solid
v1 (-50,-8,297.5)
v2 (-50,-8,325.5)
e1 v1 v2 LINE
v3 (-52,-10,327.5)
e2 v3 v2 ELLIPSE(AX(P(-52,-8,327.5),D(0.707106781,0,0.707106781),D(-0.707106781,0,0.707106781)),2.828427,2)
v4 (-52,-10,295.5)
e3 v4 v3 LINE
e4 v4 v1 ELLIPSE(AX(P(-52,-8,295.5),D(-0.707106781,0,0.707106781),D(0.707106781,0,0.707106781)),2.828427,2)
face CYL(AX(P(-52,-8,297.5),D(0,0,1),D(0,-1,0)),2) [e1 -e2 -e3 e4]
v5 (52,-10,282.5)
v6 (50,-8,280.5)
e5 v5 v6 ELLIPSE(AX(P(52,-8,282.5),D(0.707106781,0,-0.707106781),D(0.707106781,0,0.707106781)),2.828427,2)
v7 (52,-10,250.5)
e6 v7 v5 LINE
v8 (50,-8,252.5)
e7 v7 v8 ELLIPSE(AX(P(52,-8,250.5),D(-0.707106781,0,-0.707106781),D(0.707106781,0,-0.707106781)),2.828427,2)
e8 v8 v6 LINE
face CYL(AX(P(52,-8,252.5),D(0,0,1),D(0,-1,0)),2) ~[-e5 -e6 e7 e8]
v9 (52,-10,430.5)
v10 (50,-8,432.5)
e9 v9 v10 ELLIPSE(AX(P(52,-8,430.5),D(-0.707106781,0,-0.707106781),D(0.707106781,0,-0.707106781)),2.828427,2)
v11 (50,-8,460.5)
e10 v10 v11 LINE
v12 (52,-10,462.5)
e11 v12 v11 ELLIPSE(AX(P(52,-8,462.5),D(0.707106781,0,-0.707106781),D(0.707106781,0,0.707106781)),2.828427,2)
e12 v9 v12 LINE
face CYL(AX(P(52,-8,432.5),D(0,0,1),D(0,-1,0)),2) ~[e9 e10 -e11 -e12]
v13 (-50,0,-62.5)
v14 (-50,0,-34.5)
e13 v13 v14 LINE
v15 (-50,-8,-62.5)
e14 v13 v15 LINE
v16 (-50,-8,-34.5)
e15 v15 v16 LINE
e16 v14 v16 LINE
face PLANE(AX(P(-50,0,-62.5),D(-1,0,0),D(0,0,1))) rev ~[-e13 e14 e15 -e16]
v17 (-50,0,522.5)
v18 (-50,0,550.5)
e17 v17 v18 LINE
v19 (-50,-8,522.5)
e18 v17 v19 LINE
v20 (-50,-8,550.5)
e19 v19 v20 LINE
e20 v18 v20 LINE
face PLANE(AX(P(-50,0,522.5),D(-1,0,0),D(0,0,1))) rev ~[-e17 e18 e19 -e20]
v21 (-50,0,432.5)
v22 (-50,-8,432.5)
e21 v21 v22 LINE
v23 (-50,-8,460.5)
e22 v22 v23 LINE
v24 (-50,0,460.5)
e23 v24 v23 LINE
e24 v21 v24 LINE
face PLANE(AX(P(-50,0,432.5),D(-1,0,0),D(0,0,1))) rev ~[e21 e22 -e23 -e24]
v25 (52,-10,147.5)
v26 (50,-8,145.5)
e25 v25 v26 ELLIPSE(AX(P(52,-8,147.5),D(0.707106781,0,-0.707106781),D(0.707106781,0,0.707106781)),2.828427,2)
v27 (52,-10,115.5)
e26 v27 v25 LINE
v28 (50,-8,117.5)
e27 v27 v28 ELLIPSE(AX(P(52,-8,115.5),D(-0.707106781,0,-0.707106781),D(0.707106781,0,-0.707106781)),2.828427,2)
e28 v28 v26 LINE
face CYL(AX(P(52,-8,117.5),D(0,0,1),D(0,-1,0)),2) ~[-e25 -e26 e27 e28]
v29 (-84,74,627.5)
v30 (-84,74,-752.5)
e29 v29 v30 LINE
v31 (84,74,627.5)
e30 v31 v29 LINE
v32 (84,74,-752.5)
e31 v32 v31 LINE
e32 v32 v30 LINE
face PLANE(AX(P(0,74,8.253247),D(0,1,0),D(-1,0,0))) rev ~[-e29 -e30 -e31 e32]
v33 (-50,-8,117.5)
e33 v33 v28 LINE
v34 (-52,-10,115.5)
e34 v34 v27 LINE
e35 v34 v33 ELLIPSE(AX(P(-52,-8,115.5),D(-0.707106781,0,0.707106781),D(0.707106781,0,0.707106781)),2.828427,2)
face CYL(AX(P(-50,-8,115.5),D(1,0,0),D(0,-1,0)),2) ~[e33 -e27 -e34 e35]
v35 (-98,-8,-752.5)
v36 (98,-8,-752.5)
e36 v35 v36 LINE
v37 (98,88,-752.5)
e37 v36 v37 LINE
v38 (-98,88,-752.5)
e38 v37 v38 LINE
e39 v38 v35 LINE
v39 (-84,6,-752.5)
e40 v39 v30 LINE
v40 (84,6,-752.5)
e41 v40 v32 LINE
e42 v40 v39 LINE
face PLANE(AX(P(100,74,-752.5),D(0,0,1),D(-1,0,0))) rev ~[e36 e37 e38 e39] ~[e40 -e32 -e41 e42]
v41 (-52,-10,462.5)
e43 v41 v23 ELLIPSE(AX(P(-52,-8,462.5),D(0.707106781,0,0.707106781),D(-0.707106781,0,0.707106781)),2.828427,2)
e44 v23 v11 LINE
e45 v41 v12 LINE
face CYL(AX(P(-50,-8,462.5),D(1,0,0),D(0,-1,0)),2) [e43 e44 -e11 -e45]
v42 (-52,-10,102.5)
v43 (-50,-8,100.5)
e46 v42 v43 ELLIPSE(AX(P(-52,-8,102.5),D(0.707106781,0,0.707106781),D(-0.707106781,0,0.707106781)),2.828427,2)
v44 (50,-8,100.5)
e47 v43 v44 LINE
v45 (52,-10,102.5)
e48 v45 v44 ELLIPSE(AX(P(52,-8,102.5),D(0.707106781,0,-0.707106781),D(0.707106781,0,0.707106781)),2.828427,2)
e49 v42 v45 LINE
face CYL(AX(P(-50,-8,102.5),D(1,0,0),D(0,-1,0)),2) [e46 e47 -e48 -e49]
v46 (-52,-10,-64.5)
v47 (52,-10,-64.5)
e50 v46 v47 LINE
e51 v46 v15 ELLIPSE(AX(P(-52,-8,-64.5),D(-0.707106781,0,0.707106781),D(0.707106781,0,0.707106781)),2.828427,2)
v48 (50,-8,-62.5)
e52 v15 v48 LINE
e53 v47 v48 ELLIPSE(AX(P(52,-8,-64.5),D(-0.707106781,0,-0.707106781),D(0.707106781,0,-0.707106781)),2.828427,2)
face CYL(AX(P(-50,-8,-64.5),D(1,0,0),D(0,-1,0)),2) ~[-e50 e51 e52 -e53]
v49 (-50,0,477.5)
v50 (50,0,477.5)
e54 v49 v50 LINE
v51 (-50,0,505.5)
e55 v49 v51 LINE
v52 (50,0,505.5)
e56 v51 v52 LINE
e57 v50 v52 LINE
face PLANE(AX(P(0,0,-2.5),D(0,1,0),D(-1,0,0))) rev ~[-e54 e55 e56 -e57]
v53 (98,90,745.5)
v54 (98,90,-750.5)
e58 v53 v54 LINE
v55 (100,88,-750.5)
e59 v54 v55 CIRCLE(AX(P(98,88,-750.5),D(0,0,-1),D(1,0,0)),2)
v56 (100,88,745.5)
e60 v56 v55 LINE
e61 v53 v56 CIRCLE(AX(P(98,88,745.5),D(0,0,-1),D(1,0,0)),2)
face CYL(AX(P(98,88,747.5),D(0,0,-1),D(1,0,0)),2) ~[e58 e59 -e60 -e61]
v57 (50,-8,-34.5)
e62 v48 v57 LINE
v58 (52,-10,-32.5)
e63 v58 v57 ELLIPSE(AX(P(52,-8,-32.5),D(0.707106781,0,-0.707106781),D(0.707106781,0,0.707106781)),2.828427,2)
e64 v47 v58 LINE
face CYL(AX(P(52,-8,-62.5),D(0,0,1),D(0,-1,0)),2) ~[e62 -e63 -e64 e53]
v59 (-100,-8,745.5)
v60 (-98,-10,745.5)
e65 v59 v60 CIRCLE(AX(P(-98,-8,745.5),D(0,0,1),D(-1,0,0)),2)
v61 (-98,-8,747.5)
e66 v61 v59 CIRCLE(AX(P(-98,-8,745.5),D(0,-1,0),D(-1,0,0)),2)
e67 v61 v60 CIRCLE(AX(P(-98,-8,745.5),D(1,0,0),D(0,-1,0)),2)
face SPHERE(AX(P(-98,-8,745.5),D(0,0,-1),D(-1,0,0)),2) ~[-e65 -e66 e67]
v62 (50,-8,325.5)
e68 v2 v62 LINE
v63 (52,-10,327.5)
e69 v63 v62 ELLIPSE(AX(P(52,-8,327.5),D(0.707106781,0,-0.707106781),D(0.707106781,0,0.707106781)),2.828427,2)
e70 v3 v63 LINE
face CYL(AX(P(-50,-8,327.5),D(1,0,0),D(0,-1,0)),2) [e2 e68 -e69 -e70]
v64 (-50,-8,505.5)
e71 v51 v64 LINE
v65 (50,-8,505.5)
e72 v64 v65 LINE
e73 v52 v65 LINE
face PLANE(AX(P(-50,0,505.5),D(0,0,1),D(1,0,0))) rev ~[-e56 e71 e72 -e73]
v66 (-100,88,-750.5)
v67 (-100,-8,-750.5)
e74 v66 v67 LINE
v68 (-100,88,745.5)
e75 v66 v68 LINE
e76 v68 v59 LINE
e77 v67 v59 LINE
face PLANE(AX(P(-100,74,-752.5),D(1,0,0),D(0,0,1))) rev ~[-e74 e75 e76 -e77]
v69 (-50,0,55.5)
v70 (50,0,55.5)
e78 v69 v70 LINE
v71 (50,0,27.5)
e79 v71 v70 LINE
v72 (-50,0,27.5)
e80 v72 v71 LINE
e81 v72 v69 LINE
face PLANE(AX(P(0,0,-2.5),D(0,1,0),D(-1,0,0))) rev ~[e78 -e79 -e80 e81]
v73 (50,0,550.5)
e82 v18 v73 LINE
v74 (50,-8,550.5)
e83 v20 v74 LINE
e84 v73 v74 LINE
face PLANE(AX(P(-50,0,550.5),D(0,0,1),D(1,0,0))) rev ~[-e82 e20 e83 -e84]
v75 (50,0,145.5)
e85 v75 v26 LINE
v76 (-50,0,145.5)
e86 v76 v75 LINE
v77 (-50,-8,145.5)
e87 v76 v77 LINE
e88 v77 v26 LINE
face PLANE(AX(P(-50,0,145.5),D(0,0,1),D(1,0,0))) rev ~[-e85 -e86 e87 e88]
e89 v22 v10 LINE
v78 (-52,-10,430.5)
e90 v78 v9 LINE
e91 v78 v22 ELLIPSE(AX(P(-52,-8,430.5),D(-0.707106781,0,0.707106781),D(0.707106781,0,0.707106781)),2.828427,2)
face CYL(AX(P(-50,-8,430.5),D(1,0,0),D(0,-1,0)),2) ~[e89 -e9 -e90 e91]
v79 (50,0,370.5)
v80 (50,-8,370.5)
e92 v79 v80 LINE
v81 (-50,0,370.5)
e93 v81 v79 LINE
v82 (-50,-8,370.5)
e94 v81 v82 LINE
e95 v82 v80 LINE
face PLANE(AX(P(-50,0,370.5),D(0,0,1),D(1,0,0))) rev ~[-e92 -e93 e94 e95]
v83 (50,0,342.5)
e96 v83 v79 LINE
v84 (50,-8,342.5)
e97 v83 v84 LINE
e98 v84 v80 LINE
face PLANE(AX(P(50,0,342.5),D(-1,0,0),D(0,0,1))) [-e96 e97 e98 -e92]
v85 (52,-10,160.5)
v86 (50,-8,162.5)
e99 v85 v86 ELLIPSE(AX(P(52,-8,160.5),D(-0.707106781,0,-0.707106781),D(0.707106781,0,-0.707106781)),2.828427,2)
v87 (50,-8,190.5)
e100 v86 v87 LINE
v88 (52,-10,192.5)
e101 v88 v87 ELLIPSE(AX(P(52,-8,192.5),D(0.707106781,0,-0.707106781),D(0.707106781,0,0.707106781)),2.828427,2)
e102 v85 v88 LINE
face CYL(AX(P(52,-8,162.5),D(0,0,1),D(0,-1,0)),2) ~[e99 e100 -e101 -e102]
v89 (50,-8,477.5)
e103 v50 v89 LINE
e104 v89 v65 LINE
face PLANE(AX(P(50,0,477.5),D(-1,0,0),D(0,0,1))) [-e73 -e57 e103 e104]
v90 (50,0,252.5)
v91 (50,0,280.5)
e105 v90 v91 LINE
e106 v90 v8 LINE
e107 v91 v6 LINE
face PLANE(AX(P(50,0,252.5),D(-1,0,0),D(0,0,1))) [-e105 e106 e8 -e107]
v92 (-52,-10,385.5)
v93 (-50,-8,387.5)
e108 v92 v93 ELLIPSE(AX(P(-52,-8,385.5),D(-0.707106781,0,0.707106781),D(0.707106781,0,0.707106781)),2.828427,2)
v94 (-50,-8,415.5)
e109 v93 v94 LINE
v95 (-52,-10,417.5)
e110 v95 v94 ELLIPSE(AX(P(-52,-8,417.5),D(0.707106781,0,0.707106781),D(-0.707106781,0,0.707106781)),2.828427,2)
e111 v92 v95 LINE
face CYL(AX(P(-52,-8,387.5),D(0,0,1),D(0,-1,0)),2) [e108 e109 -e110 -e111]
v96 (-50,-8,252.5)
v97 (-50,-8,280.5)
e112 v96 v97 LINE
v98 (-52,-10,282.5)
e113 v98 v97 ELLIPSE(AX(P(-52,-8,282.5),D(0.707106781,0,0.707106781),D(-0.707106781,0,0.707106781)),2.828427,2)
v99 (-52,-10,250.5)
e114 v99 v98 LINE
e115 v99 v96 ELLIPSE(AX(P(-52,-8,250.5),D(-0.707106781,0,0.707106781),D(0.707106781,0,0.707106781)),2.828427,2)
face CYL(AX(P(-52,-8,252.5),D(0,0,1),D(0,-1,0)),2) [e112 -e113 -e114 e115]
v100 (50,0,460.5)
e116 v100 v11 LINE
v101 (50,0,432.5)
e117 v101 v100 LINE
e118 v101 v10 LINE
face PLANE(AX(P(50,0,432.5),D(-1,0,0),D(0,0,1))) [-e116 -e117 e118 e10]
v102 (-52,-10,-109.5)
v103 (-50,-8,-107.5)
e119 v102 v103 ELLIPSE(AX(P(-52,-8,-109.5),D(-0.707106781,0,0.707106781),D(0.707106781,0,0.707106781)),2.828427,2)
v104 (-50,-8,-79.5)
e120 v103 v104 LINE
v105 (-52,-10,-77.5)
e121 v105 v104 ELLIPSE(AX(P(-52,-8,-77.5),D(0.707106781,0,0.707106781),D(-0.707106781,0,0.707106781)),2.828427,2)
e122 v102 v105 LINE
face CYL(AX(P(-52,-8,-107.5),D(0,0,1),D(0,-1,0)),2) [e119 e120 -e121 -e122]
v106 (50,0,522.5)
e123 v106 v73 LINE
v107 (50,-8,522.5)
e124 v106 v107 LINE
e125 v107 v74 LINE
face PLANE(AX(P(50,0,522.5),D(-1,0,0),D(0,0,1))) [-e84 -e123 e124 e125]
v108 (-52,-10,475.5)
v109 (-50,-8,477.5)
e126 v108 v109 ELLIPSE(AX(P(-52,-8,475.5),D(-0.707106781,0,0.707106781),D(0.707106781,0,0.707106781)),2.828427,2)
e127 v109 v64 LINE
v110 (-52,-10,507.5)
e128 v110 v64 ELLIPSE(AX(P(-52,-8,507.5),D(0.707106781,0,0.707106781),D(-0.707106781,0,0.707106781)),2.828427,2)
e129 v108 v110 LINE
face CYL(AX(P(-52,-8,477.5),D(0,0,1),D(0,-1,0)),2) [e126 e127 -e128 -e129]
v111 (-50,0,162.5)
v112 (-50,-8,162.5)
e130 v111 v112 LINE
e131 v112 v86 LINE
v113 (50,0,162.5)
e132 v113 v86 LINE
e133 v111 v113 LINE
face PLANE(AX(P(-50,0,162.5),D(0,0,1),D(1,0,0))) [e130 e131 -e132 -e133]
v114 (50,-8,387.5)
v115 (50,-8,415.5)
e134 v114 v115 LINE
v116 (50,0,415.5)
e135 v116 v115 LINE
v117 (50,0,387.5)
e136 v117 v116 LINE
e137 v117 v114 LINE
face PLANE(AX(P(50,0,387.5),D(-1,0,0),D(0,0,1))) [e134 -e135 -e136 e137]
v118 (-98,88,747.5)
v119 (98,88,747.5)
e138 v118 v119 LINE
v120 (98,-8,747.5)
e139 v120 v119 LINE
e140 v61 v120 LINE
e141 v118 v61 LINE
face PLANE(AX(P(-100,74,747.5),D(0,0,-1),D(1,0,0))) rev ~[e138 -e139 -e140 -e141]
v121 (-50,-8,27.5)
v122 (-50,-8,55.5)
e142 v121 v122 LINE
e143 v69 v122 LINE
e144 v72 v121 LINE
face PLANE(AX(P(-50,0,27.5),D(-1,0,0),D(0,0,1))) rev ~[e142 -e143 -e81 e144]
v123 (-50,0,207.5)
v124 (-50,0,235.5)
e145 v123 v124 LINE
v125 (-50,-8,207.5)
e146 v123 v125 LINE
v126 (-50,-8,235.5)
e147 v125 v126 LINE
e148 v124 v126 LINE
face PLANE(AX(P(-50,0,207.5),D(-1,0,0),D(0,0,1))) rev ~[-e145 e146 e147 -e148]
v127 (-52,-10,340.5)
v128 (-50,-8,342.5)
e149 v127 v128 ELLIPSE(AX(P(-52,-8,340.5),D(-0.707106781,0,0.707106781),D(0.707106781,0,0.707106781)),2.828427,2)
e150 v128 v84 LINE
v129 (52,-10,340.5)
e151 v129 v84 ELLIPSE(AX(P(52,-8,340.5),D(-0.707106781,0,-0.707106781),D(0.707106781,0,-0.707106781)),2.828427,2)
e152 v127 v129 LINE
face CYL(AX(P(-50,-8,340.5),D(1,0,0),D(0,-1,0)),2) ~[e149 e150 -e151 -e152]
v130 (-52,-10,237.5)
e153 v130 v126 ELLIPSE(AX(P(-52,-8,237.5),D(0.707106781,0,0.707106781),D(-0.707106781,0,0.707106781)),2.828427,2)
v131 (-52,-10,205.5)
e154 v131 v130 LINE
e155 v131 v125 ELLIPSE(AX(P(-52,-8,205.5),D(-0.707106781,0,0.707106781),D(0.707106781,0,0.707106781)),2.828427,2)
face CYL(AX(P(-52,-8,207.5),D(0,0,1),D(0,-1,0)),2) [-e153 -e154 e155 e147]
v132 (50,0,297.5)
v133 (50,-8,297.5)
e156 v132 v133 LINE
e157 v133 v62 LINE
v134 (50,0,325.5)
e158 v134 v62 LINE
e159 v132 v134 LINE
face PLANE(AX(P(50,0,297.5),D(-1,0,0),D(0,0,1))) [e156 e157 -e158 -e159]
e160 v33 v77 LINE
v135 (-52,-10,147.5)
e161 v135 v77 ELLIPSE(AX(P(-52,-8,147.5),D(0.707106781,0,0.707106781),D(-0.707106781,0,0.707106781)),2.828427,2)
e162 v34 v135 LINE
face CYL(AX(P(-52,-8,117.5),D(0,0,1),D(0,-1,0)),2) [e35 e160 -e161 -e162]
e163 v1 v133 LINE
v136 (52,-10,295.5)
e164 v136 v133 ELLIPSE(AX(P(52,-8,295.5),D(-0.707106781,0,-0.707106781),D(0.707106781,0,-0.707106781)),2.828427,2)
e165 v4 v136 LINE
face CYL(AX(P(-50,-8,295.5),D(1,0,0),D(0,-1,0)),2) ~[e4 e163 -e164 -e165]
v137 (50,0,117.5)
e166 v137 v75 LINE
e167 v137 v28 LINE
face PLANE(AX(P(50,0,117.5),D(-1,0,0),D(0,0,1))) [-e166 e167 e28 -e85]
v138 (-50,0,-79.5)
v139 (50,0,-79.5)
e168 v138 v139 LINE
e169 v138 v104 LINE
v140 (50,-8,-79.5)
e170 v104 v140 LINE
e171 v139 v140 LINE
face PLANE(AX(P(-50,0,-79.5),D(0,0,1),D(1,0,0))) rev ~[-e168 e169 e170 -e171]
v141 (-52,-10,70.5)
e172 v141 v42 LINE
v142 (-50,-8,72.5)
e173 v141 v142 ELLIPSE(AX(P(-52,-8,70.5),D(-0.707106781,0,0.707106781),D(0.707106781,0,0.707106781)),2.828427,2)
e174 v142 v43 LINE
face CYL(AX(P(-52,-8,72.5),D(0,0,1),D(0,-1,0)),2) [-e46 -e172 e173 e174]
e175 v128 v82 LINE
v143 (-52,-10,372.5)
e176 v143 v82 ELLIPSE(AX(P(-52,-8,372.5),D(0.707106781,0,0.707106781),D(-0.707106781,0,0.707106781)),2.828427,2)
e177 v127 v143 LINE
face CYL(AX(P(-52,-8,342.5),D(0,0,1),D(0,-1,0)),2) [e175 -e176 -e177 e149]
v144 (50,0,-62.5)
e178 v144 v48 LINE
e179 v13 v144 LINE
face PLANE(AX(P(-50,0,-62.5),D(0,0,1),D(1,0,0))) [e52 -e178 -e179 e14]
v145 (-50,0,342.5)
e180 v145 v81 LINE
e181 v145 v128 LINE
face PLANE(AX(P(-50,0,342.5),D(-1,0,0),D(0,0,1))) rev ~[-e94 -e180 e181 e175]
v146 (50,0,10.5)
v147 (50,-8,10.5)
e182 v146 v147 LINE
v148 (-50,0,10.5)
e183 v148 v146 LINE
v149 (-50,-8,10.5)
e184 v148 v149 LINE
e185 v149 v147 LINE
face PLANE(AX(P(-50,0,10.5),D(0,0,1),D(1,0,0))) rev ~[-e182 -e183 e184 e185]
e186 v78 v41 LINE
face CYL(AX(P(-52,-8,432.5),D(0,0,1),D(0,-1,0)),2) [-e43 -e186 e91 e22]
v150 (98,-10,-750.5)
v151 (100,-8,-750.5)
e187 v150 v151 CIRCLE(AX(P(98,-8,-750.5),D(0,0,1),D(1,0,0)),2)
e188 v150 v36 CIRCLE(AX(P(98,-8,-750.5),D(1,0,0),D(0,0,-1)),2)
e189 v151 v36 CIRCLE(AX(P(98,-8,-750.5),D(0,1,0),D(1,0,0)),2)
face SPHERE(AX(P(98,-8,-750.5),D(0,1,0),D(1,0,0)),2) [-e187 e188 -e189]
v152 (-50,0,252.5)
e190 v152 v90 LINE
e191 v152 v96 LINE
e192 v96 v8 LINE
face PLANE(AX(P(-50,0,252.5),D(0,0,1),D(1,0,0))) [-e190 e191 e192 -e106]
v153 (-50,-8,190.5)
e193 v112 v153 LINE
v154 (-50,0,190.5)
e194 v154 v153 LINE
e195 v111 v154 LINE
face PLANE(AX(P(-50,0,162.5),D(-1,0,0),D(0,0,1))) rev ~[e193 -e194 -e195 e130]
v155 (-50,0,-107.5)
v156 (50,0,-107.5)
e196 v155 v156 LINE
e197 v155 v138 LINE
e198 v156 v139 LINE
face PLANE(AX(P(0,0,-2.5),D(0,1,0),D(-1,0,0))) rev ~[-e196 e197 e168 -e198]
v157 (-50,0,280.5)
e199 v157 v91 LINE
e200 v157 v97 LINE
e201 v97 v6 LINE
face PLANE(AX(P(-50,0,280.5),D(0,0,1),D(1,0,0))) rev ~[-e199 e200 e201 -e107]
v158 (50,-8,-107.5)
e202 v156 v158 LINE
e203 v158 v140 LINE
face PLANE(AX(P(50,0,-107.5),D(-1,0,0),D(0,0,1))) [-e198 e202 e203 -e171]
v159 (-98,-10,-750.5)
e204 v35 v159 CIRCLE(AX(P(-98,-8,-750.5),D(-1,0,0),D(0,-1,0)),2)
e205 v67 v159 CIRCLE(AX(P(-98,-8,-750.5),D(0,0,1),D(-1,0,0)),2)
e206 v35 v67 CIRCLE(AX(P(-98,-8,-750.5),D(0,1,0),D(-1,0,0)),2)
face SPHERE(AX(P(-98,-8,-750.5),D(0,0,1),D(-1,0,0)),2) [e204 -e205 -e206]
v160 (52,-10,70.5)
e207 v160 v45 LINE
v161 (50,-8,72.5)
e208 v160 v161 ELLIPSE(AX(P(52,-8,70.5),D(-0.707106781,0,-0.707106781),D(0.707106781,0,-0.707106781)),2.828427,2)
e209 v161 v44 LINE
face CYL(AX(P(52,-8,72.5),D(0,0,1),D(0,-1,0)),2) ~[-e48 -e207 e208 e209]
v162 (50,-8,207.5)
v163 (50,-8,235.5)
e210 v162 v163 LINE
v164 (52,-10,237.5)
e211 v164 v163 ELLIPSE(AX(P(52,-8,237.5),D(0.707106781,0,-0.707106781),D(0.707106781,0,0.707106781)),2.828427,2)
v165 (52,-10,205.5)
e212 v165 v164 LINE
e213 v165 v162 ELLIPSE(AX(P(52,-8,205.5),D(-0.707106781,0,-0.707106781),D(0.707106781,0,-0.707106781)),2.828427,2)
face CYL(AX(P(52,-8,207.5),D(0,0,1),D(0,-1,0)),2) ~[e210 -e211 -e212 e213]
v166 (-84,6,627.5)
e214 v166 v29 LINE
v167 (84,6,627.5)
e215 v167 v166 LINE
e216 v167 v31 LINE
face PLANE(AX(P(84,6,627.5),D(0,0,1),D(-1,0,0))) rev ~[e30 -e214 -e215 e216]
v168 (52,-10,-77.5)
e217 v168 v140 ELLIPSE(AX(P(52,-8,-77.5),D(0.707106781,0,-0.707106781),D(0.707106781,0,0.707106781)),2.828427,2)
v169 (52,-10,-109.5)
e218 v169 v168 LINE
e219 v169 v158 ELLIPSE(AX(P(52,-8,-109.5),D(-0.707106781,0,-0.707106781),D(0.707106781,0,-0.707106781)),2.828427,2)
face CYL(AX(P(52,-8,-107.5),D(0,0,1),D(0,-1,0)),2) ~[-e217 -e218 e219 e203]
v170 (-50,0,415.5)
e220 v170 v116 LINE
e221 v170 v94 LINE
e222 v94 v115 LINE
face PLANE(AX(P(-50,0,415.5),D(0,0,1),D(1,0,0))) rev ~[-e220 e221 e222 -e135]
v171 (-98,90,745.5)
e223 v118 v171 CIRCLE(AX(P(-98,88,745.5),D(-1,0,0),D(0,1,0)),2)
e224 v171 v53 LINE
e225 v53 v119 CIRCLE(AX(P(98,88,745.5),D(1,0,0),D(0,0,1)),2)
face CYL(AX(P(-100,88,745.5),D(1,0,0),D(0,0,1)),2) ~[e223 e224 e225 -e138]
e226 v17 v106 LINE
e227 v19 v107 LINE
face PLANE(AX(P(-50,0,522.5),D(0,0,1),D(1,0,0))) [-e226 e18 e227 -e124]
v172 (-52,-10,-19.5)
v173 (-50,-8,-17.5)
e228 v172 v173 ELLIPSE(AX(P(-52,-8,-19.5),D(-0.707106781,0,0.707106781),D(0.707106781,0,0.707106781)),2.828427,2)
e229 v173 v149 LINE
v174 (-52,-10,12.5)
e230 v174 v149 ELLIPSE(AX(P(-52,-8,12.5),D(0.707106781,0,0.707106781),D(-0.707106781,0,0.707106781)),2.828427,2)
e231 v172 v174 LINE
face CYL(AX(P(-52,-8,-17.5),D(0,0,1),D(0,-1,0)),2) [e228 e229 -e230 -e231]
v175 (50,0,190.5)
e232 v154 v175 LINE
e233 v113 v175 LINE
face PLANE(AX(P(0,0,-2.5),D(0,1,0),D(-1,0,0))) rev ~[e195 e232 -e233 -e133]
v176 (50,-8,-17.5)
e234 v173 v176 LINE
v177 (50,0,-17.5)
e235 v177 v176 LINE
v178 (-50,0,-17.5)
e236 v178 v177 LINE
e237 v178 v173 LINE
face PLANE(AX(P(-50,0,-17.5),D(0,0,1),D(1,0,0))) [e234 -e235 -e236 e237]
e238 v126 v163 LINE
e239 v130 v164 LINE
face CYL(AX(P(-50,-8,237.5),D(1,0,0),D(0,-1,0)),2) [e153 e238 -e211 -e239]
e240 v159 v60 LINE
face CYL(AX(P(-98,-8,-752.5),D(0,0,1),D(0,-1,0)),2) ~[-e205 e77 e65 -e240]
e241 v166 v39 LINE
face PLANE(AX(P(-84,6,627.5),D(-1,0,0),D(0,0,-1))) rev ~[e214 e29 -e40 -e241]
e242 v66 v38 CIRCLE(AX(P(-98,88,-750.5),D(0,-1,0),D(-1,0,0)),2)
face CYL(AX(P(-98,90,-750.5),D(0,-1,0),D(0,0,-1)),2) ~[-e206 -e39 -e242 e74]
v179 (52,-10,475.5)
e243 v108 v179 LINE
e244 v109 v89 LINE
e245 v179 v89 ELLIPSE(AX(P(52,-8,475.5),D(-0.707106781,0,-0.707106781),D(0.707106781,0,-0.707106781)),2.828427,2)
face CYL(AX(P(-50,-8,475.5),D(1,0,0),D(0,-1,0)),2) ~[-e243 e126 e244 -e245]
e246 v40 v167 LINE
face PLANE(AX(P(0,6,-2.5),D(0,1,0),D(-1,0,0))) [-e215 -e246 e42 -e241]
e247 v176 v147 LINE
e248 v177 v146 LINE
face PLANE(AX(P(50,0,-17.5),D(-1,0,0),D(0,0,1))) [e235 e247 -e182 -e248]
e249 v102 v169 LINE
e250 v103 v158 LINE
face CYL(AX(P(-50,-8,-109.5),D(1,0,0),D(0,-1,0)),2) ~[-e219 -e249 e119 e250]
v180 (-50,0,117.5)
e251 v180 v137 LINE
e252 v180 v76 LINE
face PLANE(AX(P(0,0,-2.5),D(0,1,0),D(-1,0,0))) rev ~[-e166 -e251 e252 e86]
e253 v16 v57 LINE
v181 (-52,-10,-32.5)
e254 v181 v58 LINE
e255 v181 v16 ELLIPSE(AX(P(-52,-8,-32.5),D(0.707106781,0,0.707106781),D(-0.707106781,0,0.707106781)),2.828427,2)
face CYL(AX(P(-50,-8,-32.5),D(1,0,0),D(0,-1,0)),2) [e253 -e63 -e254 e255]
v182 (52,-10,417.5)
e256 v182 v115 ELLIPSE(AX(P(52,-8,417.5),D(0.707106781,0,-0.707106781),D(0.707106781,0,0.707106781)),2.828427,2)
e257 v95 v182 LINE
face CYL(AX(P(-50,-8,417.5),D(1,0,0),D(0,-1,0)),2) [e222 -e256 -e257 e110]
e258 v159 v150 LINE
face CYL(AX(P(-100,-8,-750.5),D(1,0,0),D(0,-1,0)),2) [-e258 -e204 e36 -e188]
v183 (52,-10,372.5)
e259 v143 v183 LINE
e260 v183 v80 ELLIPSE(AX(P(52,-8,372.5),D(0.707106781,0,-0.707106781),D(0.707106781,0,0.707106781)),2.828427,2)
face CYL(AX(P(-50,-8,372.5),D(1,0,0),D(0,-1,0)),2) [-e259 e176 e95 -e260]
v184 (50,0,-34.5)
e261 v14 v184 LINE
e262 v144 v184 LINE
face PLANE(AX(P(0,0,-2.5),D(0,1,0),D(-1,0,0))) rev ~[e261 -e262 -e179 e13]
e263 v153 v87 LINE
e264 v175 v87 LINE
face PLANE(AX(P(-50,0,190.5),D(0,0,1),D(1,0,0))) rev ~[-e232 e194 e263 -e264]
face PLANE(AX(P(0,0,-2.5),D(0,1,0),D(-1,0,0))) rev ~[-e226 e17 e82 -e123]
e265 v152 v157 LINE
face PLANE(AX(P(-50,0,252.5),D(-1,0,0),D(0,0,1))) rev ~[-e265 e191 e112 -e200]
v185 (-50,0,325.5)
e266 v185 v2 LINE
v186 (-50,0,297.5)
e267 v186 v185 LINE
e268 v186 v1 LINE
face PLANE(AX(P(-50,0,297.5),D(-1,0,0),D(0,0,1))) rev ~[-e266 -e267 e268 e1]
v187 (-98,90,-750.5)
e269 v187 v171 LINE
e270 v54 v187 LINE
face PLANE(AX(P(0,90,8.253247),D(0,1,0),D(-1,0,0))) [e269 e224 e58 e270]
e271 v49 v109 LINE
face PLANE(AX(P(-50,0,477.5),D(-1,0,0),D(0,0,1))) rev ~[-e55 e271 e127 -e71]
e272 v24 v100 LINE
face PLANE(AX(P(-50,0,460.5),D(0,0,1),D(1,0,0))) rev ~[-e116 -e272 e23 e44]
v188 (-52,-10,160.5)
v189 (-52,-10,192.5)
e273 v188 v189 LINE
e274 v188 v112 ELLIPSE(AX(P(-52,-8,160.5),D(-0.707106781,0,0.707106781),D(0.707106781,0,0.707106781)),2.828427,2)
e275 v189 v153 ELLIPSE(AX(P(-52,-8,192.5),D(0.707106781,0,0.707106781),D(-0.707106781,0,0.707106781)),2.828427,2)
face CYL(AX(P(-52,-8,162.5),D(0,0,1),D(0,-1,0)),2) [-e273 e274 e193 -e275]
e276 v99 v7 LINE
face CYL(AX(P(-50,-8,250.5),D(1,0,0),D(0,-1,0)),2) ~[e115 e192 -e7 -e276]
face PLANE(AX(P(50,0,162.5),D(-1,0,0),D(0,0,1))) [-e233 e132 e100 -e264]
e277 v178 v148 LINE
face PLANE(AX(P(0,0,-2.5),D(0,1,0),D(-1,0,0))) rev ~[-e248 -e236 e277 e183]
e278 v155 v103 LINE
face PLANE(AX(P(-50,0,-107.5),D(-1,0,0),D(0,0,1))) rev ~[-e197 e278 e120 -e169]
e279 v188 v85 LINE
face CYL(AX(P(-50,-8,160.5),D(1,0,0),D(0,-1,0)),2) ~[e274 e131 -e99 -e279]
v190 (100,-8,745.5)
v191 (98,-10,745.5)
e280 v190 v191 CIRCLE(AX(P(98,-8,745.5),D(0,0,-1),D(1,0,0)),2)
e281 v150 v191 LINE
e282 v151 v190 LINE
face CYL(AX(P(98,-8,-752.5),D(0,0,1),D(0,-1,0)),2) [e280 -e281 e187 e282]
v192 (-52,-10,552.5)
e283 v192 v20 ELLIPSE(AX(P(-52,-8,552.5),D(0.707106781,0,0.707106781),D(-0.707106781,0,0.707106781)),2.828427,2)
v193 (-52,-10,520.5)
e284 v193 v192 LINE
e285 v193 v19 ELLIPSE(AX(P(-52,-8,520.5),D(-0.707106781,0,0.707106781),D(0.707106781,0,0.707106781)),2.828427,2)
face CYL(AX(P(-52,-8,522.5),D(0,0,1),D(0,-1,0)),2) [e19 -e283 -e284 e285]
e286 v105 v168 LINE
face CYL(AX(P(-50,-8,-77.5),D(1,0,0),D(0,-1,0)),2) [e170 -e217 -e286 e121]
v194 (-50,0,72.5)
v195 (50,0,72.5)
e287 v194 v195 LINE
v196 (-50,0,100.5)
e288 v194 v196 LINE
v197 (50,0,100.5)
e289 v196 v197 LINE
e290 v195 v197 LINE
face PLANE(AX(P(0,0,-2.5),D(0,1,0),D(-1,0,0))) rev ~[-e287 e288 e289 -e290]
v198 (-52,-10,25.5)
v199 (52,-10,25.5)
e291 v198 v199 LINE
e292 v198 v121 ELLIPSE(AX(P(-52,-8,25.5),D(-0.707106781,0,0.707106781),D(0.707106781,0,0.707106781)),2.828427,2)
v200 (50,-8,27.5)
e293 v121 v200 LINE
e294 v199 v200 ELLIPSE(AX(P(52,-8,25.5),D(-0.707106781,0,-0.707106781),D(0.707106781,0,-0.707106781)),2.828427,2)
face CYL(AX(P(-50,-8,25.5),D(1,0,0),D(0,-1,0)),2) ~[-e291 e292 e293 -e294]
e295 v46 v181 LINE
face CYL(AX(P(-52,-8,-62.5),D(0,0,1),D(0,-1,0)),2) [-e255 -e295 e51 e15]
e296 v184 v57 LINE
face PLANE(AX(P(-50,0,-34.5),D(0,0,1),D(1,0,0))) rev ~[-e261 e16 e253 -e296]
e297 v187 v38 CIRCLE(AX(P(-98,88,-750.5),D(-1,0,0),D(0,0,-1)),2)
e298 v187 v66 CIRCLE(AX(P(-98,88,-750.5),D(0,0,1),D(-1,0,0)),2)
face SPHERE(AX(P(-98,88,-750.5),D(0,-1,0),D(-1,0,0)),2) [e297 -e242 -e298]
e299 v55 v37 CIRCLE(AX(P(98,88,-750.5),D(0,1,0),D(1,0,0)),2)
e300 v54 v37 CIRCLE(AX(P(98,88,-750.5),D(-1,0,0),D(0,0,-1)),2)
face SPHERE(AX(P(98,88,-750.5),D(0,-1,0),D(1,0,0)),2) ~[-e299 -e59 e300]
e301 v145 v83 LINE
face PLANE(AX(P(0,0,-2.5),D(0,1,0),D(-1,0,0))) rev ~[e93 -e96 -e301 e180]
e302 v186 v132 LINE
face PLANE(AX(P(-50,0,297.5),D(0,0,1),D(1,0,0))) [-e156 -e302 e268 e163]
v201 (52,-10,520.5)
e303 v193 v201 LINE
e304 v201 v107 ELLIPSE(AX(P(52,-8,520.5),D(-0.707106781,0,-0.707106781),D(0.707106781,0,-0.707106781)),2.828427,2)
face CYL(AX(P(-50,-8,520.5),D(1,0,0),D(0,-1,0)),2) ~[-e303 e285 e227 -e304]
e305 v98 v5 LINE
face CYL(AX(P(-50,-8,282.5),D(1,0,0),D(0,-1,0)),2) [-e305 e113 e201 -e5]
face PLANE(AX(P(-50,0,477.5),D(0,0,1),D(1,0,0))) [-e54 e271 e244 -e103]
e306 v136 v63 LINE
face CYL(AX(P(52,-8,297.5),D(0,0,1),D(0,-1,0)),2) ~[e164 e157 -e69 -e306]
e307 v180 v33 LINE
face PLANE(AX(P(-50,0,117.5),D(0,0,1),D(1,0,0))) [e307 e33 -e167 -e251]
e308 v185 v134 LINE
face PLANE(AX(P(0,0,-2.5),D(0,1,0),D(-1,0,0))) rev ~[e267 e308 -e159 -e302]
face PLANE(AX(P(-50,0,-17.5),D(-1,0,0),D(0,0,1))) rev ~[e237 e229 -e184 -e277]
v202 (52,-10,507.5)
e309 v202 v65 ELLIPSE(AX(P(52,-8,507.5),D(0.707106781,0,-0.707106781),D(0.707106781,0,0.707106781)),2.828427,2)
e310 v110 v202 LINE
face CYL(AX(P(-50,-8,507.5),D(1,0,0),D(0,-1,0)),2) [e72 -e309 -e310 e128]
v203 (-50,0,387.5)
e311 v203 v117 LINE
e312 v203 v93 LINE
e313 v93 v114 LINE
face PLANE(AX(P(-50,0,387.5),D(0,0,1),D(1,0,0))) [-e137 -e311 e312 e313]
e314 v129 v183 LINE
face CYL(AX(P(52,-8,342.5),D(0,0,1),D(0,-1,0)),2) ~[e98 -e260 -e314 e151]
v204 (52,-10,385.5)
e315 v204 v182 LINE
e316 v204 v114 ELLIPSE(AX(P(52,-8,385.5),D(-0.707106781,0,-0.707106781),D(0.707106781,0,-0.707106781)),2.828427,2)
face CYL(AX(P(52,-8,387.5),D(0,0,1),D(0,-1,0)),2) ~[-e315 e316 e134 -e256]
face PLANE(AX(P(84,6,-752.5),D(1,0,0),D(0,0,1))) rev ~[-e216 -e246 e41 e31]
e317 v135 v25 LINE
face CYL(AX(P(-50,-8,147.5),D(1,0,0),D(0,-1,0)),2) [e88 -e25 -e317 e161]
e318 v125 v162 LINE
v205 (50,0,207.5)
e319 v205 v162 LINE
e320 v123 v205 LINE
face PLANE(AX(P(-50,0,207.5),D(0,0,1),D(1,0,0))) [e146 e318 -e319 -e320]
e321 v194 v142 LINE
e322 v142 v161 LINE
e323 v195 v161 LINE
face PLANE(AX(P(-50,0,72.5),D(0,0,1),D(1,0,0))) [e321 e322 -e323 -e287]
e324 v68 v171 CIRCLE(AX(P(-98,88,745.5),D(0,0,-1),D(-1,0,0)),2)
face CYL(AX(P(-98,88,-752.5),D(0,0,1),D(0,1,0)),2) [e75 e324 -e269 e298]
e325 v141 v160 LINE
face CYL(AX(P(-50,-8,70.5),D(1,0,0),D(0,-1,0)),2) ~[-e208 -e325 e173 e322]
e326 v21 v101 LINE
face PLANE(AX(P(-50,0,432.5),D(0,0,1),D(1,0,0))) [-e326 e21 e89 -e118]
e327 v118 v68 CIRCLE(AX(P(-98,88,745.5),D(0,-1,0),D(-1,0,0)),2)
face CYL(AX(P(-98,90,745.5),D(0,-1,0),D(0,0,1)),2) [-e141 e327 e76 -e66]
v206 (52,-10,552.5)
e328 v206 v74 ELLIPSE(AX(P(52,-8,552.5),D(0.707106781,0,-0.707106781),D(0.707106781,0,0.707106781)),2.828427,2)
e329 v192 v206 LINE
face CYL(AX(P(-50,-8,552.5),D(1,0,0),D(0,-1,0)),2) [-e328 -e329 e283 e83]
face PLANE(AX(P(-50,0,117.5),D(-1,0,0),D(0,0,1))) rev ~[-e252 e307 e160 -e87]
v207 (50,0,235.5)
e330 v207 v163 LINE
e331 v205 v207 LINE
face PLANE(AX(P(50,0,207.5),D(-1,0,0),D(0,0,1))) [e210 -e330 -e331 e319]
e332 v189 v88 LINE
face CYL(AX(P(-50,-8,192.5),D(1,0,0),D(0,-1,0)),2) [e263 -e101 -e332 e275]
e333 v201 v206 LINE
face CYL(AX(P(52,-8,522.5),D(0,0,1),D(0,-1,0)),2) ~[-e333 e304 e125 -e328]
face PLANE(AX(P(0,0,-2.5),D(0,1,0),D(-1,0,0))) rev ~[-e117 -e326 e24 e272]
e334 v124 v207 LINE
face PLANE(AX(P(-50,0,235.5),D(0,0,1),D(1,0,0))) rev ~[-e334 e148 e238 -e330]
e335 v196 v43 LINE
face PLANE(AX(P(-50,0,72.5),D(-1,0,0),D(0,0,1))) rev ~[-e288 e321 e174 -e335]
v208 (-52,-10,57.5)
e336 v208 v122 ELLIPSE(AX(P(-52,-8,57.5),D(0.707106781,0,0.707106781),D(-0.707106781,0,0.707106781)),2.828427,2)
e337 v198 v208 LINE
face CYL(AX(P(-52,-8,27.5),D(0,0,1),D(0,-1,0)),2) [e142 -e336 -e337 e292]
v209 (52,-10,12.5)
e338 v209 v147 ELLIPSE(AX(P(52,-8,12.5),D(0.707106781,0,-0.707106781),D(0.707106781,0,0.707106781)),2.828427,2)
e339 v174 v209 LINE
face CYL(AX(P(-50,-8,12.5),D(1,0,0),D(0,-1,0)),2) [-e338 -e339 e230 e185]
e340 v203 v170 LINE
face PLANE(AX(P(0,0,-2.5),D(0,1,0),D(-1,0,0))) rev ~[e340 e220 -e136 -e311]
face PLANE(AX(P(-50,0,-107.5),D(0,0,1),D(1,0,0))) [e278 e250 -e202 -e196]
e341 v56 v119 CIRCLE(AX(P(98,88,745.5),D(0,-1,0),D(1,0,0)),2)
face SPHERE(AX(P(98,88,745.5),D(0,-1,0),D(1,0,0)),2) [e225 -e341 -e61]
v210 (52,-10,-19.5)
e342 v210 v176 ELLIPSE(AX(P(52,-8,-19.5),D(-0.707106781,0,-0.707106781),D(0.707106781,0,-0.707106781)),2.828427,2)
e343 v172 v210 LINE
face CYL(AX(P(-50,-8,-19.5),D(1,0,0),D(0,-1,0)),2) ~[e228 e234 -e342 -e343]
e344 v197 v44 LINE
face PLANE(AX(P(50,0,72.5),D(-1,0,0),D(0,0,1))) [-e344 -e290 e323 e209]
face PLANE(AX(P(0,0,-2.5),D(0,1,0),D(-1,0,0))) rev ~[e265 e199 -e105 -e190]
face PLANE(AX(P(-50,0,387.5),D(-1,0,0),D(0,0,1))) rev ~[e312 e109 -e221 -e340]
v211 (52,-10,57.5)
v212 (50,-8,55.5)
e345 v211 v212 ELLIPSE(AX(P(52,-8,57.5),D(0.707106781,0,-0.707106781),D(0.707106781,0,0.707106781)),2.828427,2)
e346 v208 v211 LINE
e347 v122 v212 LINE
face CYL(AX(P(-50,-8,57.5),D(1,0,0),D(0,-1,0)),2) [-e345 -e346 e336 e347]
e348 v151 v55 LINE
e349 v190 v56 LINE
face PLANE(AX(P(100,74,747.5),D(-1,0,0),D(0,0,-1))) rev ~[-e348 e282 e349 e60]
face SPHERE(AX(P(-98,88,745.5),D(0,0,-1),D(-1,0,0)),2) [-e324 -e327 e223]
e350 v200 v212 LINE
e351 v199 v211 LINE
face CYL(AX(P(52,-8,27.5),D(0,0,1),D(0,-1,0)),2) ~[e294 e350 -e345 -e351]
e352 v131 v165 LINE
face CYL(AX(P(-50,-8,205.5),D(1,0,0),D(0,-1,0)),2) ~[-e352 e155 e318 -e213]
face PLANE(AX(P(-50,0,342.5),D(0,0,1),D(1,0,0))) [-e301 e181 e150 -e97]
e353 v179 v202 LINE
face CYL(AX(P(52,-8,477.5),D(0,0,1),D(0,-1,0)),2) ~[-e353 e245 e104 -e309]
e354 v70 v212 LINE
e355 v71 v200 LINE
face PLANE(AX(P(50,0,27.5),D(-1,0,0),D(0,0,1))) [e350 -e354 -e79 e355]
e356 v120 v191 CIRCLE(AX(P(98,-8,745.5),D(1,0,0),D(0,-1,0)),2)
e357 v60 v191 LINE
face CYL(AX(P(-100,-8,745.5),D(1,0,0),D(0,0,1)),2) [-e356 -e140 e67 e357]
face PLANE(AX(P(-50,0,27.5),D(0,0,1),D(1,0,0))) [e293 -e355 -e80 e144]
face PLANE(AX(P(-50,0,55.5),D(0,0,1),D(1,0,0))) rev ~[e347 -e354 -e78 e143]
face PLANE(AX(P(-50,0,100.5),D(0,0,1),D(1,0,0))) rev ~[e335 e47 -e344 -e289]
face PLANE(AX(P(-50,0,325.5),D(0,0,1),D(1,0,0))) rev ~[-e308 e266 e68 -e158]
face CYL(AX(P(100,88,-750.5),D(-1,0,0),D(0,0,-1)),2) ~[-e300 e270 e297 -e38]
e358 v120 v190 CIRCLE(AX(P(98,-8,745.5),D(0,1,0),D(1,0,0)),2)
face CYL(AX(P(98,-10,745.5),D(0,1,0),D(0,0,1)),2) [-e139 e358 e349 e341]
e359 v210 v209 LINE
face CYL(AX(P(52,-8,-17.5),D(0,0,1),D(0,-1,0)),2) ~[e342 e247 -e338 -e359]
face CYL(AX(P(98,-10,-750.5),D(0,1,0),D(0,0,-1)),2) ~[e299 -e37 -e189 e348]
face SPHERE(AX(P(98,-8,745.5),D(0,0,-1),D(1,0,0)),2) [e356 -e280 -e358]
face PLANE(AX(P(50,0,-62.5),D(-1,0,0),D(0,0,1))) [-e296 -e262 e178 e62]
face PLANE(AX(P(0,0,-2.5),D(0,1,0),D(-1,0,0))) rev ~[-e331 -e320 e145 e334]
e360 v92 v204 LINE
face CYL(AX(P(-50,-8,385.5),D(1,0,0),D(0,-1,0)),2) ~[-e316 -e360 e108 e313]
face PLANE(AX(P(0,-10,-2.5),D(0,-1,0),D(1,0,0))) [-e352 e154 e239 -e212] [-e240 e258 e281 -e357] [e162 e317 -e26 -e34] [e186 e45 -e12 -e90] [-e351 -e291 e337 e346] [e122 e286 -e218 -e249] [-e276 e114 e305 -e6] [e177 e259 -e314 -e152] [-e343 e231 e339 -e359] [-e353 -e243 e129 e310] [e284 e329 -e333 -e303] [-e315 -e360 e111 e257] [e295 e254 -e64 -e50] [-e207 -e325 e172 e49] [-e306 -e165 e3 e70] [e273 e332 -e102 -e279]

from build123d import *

# Parameters (mm, degrees)
F0_W     = 200
F0_H     = 1500
F0_W_2   = 100
F0_H_2   = 28
F1_DEPTH = 10
F2_W     = 200
F2_H     = 1500
F2_W_2   = 100
F2_H_2   = 28
F3_DEPTH = 6
F5_DEPTH = 68
F6_W     = 168
F6_H     = 1380
F7_DEPTH = 16
F8_R     = 2


# Not quite as in the source:
# - a feature names something its author has since deleted; it is built from what else it names


with BuildPart() as f1:
    # F0 (on Front) → F1 (new body)
    with BuildSketch(Plane.XZ):
        with Locations((0, -2.5)):
            Rectangle(F0_W, F0_H)
        with Locations((0, -93.5)):
            Rectangle(F0_W_2, F0_H_2, mode=Mode.SUBTRACT)
        with Locations((0, -48.5)):
            Rectangle(F0_W_2, F0_H_2, mode=Mode.SUBTRACT)
        with Locations((0, -3.5)):
            Rectangle(F0_W_2, F0_H_2, mode=Mode.SUBTRACT)
        with Locations((0, 41.5)):
            Rectangle(F0_W_2, F0_H_2, mode=Mode.SUBTRACT)
        with Locations((0, 86.5)):
            Rectangle(F0_W_2, F0_H_2, mode=Mode.SUBTRACT)
        with Locations((0, 131.5)):
            Rectangle(F0_W_2, F0_H_2, mode=Mode.SUBTRACT)
        with Locations((0, 176.5)):
            Rectangle(F0_W_2, F0_H_2, mode=Mode.SUBTRACT)
        with Locations((0, 221.5)):
            Rectangle(F0_W_2, F0_H_2, mode=Mode.SUBTRACT)
        with Locations((0, 266.5)):
            Rectangle(F0_W_2, F0_H_2, mode=Mode.SUBTRACT)
        with Locations((0, 311.5)):
            Rectangle(F0_W_2, F0_H_2, mode=Mode.SUBTRACT)
        with Locations((0, 356.5)):
            Rectangle(F0_W_2, F0_H_2, mode=Mode.SUBTRACT)
        with Locations((0, 401.5)):
            Rectangle(F0_W_2, F0_H_2, mode=Mode.SUBTRACT)
        with Locations((0, 446.5)):
            Rectangle(F0_W_2, F0_H_2, mode=Mode.SUBTRACT)
        with Locations((0, 491.5)):
            Rectangle(F0_W_2, F0_H_2, mode=Mode.SUBTRACT)
        with Locations((0, 536.5)):
            Rectangle(F0_W_2, F0_H_2, mode=Mode.SUBTRACT)
    extrude(amount=F1_DEPTH)

    # F2 (on face) → F3 (join)
    with BuildSketch(Plane(origin=(0, 0, 0), x_dir=(-1, 0, 0), z_dir=(0, 1, 0))):
        with Locations((0, -2.5)):
            Rectangle(F2_W, F2_H)
        with Locations((0, -93.5)):
            Rectangle(F2_W_2, F2_H_2, mode=Mode.SUBTRACT)
        with Locations((0, -48.5)):
            Rectangle(F2_W_2, F2_H_2, mode=Mode.SUBTRACT)
        with Locations((0, -3.5)):
            Rectangle(F2_W_2, F2_H_2, mode=Mode.SUBTRACT)
        with Locations((0, 41.5)):
            Rectangle(F2_W_2, F2_H_2, mode=Mode.SUBTRACT)
        with Locations((0, 86.5)):
            Rectangle(F2_W_2, F2_H_2, mode=Mode.SUBTRACT)
        with Locations((0, 131.5)):
            Rectangle(F2_W_2, F2_H_2, mode=Mode.SUBTRACT)
        with Locations((0, 176.5)):
            Rectangle(F2_W_2, F2_H_2, mode=Mode.SUBTRACT)
        with Locations((0, 221.5)):
            Rectangle(F2_W_2, F2_H_2, mode=Mode.SUBTRACT)
        with Locations((0, 266.5)):
            Rectangle(F2_W_2, F2_H_2, mode=Mode.SUBTRACT)
        with Locations((0, 311.5)):
            Rectangle(F2_W_2, F2_H_2, mode=Mode.SUBTRACT)
        with Locations((0, 356.5)):
            Rectangle(F2_W_2, F2_H_2, mode=Mode.SUBTRACT)
        with Locations((0, 401.5)):
            Rectangle(F2_W_2, F2_H_2, mode=Mode.SUBTRACT)
        with Locations((0, 446.5)):
            Rectangle(F2_W_2, F2_H_2, mode=Mode.SUBTRACT)
        with Locations((0, 491.5)):
            Rectangle(F2_W_2, F2_H_2, mode=Mode.SUBTRACT)
        with Locations((0, 536.5)):
            Rectangle(F2_W_2, F2_H_2, mode=Mode.SUBTRACT)
        with Locations((0, -93.5)):
            Rectangle(F2_W_2, F2_H_2)
        with Locations((0, -48.5)):
            Rectangle(F2_W_2, F2_H_2)
        with Locations((0, -3.5)):
            Rectangle(F2_W_2, F2_H_2)
        with Locations((0, 41.5)):
            Rectangle(F2_W_2, F2_H_2)
        with Locations((0, 86.5)):
            Rectangle(F2_W_2, F2_H_2)
        with Locations((0, 131.5)):
            Rectangle(F2_W_2, F2_H_2)
        with Locations((0, 176.5)):
            Rectangle(F2_W_2, F2_H_2)
        with Locations((0, 221.5)):
            Rectangle(F2_W_2, F2_H_2)
        with Locations((0, 266.5)):
            Rectangle(F2_W_2, F2_H_2)
        with Locations((0, 311.5)):
            Rectangle(F2_W_2, F2_H_2)
        with Locations((0, 356.5)):
            Rectangle(F2_W_2, F2_H_2)
        with Locations((0, 401.5)):
            Rectangle(F2_W_2, F2_H_2)
        with Locations((0, 446.5)):
            Rectangle(F2_W_2, F2_H_2)
        with Locations((0, 491.5)):
            Rectangle(F2_W_2, F2_H_2)
        with Locations((0, 536.5)):
            Rectangle(F2_W_2, F2_H_2)
    extrude(amount=F3_DEPTH)

    # F4 (on face) → F5 (join)
    with BuildSketch(Plane(origin=(0, 6, 0), x_dir=(-1, 0, 0), z_dir=(0, 1, 0))):
        Polygon((100, 747.5), (-100, 747.5), (-100, 627.5), (-100, -752.5), (-84, -752.5), (-84, -732.5), (-84, 627.5), (84, 627.5), (84, -732.5), (84, -752.5), (100, -752.5), (100, 727.5), align=None)
    extrude(amount=F5_DEPTH)

    # F6 (on face) → F7 (join)
    with BuildSketch(Plane(origin=(0, 74, 0), x_dir=(-1, 0, 0), z_dir=(0, 1, 0))):
        Polygon((100, 747.5), (-100, 747.5), (-100, -752.5), (-84, -752.5), (-84, 627.5), (84, 627.5), (84, -752.5), (100, -752.5), align=None)
        with Locations((0, -62.5)):
            Rectangle(F6_W, F6_H)
    extrude(amount=F7_DEPTH)

    # F8
    f8_edges = [f1.edges().sort_by_distance(p)[0] for p in [
        (100, 40, -752.5),
        (100, -10, -2.5),
        (100, 40, 747.5),
        (100, 90, -2.5),
        (-100, -10, -2.5),
        (-100, 40, -752.5),
        (-100, 90, -2.5),
        (-100, 40, 747.5),
        (0, -10, 747.5),
        (0, -10, -752.5),
        (0, -10, -107.5),
        (-50, -10, -93.5),
        (0, -10, -79.5),
        (50, -10, -93.5),
        (0, -10, -62.5),
        (-50, -10, -48.5),
        (0, -10, -34.5),
        (50, -10, -48.5),
        (0, -10, -17.5),
        (-50, -10, -3.5),
        (0, -10, 10.5),
        (50, -10, -3.5),
        (0, -10, 27.5),
        (-50, -10, 41.5),
        (0, -10, 55.5),
        (50, -10, 41.5),
        (0, -10, 72.5),
        (-50, -10, 86.5),
        (0, -10, 100.5),
        (50, -10, 86.5),
        (0, -10, 117.5),
        (-50, -10, 131.5),
        (0, -10, 145.5),
        (50, -10, 131.5),
        (0, -10, 162.5),
        (-50, -10, 176.5),
        (0, -10, 190.5),
        (50, -10, 176.5),
        (0, -10, 207.5),
        (-50, -10, 221.5),
        (0, -10, 235.5),
        (50, -10, 221.5),
        (0, -10, 252.5),
        (-50, -10, 266.5),
        (0, -10, 280.5),
        (50, -10, 266.5),
        (0, -10, 297.5),
        (-50, -10, 311.5),
        (0, -10, 325.5),
        (50, -10, 311.5),
        (0, -10, 342.5),
        (-50, -10, 356.5),
        (0, -10, 370.5),
        (50, -10, 356.5),
        (0, -10, 387.5),
        (-50, -10, 401.5),
        (0, -10, 415.5),
        (50, -10, 401.5),
        (0, -10, 432.5),
        (-50, -10, 446.5),
        (0, -10, 460.5),
        (50, -10, 446.5),
        (0, -10, 477.5),
        (-50, -10, 491.5),
        (0, -10, 505.5),
        (50, -10, 491.5),
        (0, -10, 522.5),
        (-50, -10, 536.5),
        (0, -10, 550.5),
        (50, -10, 536.5),
        (0, 90, 747.5),
        (0, 90, -752.5),
    ]]
    fillet(f8_edges, radius=F8_R)


solid = f1.part
